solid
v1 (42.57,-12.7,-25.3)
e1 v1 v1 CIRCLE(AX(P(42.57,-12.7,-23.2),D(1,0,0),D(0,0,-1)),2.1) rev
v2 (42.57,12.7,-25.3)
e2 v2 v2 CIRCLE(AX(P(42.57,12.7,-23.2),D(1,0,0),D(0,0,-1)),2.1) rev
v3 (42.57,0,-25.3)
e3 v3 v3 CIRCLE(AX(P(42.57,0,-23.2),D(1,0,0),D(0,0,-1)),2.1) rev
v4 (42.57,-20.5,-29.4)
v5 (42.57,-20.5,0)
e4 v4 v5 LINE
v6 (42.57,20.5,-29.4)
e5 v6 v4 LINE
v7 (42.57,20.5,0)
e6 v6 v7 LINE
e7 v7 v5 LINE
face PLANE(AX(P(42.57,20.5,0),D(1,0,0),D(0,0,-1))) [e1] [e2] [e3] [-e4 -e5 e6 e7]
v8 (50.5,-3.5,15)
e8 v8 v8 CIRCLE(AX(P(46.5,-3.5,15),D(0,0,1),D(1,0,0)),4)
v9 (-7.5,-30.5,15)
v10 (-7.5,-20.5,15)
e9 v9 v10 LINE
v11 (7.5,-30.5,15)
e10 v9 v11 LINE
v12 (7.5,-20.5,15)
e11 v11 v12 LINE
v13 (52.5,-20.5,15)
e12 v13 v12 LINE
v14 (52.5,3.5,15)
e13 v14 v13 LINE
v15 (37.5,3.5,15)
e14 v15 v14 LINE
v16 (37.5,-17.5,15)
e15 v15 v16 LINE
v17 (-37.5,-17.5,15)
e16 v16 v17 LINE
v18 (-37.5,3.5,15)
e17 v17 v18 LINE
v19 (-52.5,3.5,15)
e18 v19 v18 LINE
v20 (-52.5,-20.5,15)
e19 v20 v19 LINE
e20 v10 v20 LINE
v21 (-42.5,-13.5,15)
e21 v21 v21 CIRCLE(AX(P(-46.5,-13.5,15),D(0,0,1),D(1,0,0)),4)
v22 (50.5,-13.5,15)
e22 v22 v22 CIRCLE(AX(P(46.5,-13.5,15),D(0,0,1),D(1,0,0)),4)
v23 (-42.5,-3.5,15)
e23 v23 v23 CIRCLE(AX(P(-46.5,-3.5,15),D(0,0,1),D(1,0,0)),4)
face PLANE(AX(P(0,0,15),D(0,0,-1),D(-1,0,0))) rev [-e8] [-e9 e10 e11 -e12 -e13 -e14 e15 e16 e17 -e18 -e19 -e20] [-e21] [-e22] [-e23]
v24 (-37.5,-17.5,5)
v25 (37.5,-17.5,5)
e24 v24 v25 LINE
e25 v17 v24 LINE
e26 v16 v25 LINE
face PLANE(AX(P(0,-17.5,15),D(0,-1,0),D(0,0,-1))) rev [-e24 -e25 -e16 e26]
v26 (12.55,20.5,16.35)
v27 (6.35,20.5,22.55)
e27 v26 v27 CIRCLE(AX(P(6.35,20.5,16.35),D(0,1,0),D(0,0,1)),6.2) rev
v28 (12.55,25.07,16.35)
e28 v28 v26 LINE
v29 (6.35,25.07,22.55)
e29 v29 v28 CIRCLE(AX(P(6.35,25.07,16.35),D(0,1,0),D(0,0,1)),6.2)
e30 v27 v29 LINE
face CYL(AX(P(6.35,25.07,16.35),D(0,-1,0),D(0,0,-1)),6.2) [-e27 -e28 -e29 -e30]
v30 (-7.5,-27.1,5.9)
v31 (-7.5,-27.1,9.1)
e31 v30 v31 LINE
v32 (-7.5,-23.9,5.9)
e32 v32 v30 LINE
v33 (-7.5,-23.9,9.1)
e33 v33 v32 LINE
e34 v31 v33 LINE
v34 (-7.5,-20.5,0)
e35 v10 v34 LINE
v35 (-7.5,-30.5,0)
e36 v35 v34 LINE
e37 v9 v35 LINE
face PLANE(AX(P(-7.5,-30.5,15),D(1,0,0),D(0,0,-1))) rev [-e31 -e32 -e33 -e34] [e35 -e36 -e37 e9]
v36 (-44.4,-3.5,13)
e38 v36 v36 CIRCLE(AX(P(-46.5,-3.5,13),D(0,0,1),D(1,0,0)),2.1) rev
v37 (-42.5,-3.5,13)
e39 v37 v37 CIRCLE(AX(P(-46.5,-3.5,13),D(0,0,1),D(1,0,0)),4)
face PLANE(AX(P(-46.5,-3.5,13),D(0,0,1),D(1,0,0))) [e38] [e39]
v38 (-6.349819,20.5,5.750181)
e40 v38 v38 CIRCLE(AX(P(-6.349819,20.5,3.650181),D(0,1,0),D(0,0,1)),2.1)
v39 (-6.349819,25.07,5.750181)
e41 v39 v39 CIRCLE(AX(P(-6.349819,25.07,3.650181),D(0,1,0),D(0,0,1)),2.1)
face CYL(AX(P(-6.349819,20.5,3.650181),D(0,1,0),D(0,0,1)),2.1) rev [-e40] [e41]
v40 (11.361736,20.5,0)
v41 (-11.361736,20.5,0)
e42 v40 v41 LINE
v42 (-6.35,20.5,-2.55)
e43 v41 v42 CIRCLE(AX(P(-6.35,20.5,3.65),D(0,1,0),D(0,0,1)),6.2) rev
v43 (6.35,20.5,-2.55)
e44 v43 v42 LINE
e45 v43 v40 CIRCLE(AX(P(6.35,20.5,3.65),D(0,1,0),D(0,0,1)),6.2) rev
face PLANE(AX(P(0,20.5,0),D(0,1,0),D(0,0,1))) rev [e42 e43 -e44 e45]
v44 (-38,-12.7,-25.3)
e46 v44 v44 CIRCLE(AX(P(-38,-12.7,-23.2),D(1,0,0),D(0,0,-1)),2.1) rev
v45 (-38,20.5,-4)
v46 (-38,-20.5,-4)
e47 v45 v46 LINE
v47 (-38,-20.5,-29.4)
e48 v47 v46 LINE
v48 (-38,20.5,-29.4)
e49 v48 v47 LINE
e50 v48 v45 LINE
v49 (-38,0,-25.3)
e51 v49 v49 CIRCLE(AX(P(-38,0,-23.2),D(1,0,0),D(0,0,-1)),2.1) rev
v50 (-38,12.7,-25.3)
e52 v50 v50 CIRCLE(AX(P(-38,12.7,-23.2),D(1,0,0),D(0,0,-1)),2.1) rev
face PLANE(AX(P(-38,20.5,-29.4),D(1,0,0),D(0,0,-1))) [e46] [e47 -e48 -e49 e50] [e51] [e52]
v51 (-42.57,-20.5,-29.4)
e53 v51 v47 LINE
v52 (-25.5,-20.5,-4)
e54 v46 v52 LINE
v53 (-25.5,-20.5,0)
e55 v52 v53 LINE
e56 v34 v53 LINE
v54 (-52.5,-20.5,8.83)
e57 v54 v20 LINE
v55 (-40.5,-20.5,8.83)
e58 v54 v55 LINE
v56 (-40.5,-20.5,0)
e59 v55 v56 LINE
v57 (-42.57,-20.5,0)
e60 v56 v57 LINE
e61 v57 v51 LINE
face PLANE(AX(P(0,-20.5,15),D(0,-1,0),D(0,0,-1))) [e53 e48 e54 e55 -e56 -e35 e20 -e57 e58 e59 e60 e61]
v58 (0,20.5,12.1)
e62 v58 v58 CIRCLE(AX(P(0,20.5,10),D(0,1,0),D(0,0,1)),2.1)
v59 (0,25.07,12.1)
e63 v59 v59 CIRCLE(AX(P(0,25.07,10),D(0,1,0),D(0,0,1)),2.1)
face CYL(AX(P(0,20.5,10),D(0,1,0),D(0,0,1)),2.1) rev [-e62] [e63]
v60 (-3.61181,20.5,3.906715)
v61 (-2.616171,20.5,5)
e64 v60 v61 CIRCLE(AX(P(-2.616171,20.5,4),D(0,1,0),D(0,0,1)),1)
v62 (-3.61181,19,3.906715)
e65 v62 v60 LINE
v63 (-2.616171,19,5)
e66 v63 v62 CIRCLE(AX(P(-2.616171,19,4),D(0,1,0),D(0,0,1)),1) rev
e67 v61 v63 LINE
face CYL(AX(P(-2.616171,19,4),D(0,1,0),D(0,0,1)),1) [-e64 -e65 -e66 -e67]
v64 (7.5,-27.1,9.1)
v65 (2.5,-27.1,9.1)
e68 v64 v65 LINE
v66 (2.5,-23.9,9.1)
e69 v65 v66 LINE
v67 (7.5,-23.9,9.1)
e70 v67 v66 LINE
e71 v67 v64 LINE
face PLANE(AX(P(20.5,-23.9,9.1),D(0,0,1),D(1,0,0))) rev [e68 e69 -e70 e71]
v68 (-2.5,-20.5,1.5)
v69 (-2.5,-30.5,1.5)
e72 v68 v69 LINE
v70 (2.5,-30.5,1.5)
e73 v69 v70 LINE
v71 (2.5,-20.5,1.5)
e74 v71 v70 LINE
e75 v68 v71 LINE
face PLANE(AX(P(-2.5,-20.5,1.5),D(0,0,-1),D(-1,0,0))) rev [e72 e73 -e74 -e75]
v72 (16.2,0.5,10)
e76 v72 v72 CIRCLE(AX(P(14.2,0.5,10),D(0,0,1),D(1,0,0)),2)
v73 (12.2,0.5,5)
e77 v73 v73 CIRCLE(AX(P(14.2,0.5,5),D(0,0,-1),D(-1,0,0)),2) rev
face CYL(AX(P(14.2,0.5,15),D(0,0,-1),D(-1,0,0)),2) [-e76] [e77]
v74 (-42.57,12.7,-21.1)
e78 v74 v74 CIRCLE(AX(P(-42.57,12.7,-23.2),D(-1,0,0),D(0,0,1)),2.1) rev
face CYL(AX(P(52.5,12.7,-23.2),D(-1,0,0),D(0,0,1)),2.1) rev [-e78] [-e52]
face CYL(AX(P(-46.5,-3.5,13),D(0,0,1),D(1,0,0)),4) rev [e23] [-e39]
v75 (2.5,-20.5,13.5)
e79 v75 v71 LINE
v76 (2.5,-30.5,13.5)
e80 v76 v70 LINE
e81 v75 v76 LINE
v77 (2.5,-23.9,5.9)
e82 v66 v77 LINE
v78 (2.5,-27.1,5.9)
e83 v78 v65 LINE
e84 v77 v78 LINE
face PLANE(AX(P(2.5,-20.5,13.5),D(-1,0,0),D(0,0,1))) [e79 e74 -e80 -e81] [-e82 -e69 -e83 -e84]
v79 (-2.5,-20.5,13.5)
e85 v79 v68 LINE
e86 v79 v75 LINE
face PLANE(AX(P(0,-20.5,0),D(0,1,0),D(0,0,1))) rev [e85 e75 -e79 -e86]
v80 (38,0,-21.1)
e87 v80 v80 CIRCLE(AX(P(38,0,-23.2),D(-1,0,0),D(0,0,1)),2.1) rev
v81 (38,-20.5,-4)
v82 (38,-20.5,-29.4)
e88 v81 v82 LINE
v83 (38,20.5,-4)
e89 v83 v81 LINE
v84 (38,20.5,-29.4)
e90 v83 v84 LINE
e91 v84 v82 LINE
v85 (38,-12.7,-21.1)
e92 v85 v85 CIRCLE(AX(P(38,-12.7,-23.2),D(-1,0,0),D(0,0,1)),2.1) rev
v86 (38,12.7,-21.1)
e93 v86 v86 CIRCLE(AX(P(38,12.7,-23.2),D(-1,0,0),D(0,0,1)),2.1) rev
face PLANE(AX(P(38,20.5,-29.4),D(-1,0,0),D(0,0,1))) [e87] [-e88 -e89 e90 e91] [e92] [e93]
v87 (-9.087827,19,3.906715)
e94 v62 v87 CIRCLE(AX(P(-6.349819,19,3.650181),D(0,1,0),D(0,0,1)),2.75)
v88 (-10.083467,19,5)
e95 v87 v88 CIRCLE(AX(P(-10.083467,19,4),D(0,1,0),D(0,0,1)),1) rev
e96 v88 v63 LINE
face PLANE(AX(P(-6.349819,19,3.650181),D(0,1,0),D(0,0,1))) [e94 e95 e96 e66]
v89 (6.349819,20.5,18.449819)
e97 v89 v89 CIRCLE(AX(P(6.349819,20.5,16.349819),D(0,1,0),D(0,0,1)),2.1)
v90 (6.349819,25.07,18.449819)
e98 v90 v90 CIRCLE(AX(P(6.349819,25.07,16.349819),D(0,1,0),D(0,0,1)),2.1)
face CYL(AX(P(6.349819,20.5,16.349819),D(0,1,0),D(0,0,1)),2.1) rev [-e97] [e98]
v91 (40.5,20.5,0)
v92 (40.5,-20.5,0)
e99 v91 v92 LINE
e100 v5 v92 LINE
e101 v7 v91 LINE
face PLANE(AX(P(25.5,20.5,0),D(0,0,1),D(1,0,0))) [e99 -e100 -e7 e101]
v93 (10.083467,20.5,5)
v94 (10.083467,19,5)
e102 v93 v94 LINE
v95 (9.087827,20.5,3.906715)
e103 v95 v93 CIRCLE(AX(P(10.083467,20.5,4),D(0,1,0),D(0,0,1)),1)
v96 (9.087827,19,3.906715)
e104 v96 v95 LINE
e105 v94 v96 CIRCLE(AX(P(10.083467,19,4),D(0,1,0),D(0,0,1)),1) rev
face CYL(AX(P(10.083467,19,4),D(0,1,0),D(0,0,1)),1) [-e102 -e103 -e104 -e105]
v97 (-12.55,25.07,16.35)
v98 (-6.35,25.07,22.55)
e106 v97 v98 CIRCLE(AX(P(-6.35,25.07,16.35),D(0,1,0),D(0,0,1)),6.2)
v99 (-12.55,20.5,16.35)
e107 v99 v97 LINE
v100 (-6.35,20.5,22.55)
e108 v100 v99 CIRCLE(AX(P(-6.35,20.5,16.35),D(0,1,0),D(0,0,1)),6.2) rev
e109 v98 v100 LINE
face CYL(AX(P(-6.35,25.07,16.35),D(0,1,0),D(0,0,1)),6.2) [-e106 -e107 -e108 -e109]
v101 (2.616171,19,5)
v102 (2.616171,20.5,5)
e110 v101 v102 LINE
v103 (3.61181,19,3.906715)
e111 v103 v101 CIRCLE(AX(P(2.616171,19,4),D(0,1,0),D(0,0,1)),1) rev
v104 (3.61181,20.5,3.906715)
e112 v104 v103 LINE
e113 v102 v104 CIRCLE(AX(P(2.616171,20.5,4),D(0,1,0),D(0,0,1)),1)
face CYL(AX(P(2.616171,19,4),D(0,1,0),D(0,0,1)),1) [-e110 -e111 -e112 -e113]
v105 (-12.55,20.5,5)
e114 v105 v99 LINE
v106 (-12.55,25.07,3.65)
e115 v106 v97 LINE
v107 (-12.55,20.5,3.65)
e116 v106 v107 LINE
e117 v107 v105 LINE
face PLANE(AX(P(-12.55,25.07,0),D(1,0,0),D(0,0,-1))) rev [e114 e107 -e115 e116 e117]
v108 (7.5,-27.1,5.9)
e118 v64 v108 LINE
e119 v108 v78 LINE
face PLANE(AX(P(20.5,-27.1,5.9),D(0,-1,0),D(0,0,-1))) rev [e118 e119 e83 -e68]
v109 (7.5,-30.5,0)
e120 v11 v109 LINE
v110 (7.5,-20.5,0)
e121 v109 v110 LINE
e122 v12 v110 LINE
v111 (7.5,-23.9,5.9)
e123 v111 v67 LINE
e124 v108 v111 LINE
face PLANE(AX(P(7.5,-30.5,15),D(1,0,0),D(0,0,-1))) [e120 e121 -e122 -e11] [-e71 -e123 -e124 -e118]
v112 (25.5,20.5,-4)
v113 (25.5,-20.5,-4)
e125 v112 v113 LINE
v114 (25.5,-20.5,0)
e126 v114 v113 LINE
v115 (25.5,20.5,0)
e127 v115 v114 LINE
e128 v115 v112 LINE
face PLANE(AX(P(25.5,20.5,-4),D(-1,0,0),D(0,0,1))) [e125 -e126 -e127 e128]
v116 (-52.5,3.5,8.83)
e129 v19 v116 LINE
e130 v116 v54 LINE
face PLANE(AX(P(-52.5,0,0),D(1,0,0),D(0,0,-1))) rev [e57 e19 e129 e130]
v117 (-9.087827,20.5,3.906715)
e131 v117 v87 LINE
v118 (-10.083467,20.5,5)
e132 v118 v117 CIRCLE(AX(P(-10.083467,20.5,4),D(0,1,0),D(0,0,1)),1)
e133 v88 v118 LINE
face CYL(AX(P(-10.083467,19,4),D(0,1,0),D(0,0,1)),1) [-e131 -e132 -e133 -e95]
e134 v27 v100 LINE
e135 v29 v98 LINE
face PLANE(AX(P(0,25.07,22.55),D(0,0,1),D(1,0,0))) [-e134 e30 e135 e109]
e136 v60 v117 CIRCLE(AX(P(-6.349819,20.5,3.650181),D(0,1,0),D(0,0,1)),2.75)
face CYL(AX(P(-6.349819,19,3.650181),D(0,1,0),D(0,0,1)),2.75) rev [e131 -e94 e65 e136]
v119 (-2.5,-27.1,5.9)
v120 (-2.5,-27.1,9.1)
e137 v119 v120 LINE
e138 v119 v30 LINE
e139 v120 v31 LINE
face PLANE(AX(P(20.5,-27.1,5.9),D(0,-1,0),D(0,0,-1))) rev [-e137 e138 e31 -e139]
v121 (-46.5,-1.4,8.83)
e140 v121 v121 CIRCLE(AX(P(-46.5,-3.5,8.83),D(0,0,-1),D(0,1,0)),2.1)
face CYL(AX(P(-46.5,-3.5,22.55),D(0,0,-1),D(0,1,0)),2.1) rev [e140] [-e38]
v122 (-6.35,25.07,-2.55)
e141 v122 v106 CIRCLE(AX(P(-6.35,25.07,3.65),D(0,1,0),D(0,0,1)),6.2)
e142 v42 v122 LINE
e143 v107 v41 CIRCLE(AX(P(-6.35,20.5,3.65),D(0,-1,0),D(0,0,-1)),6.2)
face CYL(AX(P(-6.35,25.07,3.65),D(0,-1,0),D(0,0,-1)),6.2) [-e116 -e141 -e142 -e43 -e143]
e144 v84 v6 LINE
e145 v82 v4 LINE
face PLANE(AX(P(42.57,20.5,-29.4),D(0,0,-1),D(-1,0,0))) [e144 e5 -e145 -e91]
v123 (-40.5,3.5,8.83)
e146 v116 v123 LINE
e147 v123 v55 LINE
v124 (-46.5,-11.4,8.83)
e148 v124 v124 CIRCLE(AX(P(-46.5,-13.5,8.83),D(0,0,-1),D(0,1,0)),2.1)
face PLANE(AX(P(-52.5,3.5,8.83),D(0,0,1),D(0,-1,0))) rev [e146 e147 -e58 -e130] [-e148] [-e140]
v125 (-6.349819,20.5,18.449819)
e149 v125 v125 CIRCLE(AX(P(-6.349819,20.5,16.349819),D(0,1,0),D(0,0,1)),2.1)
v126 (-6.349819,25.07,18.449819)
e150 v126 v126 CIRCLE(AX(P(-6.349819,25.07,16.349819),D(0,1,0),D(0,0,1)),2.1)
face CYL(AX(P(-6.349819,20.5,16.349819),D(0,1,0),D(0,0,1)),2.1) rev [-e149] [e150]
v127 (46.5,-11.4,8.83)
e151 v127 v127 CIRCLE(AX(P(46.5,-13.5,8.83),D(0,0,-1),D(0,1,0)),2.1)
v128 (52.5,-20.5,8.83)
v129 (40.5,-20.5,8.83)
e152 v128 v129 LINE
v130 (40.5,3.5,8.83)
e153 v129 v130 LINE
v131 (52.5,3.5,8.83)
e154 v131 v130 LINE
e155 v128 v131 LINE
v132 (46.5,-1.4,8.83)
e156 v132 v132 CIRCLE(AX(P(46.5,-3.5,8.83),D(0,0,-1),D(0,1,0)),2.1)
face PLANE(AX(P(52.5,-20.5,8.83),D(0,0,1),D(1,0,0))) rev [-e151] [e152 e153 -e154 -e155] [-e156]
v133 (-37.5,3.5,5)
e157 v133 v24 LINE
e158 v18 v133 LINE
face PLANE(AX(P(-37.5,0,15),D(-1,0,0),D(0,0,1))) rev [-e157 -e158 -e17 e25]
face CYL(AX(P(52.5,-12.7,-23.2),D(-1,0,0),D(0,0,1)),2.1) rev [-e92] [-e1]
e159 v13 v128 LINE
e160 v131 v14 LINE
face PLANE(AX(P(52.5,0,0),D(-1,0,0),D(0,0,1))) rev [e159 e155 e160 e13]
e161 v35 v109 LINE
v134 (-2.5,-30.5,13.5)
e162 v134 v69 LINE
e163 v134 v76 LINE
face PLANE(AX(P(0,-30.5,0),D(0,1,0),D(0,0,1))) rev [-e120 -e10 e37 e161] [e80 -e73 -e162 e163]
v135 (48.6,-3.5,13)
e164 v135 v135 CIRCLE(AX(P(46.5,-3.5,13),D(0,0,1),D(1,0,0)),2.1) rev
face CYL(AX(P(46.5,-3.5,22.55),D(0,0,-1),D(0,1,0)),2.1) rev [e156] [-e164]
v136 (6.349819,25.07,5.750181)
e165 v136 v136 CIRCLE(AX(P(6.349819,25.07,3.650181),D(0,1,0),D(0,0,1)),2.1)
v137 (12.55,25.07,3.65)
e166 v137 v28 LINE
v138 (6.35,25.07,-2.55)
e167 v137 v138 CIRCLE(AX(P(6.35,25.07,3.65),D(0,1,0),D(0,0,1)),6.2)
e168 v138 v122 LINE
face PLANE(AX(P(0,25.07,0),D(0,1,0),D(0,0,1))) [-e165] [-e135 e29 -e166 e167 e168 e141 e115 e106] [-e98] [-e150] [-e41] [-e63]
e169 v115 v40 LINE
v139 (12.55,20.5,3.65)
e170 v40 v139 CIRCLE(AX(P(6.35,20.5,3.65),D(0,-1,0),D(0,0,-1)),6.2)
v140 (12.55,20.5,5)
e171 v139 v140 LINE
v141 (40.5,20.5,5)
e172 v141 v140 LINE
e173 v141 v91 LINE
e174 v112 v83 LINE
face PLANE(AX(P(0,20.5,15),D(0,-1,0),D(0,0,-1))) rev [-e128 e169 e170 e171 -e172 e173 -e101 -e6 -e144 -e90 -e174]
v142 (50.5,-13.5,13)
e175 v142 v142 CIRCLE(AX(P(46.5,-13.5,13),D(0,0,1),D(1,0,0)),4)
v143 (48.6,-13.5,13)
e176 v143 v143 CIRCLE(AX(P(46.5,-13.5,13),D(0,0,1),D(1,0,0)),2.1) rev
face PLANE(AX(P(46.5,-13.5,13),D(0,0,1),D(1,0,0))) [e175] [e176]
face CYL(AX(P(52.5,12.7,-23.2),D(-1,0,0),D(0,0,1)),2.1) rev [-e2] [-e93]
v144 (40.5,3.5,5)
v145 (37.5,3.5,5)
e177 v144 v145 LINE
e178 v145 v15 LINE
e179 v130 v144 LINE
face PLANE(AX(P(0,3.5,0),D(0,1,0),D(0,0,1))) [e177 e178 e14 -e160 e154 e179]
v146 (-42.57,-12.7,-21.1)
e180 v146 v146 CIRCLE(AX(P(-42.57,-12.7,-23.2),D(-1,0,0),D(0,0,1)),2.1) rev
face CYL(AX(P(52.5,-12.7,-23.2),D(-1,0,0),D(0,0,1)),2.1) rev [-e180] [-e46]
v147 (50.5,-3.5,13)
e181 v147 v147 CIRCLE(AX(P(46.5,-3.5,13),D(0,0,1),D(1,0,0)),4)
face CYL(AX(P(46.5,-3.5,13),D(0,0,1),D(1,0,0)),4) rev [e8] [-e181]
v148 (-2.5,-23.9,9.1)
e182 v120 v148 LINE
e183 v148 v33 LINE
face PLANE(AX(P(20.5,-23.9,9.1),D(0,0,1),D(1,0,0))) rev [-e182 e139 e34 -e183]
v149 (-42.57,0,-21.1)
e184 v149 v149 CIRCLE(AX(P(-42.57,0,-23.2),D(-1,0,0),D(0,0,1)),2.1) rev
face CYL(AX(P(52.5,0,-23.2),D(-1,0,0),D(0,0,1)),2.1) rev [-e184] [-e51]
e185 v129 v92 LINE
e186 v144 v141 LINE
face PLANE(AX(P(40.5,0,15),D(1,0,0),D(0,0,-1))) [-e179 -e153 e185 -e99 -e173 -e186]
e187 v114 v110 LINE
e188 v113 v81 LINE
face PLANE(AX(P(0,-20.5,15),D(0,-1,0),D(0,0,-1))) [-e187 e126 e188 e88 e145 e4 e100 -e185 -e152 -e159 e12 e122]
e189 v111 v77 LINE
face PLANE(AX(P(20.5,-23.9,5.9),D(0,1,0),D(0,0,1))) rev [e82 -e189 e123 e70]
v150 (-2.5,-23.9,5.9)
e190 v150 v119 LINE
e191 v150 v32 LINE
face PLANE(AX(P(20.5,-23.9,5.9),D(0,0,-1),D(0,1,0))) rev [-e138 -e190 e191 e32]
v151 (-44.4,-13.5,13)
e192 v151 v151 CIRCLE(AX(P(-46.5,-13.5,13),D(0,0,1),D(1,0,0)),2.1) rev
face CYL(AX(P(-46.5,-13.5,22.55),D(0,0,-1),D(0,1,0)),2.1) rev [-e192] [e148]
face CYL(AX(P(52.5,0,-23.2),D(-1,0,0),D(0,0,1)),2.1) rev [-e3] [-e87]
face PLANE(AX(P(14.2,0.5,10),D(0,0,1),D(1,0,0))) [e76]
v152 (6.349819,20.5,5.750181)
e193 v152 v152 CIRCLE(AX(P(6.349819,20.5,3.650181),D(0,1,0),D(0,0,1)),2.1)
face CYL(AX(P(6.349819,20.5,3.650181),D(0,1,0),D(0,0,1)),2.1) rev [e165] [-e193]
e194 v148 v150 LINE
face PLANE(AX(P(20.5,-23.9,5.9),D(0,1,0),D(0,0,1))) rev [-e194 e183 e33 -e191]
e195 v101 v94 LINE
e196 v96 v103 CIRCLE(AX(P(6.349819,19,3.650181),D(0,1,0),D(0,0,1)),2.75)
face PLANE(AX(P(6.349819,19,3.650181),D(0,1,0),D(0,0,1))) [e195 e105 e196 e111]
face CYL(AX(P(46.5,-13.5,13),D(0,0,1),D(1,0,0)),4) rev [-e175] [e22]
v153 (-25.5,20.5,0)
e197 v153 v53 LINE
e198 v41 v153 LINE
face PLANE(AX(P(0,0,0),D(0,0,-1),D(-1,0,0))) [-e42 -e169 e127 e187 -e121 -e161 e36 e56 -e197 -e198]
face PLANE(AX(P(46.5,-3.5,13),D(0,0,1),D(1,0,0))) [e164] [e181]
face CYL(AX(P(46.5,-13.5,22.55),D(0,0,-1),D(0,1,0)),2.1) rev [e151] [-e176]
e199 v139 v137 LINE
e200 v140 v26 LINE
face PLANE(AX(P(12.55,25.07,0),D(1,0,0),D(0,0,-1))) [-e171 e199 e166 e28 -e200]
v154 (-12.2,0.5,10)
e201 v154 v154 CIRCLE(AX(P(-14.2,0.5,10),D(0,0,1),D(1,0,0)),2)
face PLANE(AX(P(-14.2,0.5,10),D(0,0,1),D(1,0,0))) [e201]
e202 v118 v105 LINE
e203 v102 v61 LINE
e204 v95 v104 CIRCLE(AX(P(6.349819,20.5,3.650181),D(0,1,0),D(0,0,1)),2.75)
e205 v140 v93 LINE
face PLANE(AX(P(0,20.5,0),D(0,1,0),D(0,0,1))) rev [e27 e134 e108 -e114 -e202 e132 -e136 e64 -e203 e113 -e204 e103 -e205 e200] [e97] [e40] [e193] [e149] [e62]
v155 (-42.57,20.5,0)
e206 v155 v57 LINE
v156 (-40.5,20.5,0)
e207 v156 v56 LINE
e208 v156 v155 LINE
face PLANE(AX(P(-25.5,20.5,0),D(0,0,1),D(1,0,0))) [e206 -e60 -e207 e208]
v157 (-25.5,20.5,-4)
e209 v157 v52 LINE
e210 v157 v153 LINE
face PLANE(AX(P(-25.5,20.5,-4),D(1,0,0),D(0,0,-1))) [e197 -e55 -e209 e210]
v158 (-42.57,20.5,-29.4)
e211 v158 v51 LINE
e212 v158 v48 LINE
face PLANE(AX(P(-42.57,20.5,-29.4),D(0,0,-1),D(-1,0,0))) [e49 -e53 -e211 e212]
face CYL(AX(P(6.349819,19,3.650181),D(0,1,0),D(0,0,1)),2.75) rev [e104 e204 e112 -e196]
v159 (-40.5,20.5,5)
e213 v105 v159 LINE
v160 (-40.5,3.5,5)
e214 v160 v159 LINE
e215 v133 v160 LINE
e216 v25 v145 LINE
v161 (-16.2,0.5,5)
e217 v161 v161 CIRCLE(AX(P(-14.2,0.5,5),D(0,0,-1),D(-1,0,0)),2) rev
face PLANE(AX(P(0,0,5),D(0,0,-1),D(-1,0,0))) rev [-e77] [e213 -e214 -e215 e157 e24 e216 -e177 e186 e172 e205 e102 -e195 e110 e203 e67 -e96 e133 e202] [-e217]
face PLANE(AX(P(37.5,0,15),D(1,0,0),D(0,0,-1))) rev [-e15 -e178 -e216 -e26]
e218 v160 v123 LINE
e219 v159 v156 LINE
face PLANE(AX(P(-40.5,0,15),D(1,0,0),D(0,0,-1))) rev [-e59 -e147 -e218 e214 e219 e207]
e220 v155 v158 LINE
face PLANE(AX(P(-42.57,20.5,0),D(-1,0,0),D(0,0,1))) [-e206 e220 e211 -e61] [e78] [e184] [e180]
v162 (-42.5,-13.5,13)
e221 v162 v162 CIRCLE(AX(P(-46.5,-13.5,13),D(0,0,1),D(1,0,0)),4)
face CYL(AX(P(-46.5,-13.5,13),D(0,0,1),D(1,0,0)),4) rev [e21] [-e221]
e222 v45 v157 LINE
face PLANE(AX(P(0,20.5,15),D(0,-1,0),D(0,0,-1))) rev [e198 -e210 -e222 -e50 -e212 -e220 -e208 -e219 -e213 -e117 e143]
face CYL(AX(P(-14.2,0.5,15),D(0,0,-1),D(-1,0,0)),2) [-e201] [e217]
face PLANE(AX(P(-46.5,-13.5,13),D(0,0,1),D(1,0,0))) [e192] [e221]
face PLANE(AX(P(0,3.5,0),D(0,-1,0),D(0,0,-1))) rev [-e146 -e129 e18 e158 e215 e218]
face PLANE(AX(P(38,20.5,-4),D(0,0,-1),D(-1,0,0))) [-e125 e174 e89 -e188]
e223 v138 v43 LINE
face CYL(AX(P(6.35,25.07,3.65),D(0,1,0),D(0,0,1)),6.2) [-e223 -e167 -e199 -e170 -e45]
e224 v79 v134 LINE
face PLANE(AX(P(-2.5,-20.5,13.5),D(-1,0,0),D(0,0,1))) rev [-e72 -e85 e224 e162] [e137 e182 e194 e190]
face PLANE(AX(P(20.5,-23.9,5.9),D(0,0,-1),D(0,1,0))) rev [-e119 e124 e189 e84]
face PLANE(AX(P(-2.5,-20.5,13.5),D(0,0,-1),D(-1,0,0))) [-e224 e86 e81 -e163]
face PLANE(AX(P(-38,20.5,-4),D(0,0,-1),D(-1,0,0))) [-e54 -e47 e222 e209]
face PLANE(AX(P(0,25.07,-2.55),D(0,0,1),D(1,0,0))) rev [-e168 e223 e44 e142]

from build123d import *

# Parameters (mm, degrees)
SKETCH1_W                = 75
SKETCH1_H                = 35
BOSS_EXTRUDE1_DEPTH      = 5
SKETCH2_R                = 2
BOSS_EXTRUDE2_DEPTH      = 10
SKETCH3_W                = 75
SKETCH3_H                = 35
BOSS_EXTRUDE3_DEPTH      = 15
CUT_EXTRUDE2_DEPTH       = 10
SKETCH8_W                = 12.55
SKETCH8_H                = 5
SKETCH8_H_2              = 2.55
BOSS_EXTRUDE6_DEPTH      = 4.57
SKETCH9_R                = 2.1
CUT_EXTRUDE3_DEPTH       = 4.57
SKETCH14_W               = 3
SKETCH14_H               = 10
CUT_EXTRUDE5_DEPTH       = 17
SKETCH15_R               = 2.75
CUT_EXTRUDE6_DEPTH       = 1.5
FILLET1_R                = 1
CUT_EXTRUDE7_START       = -5
SKETCH19_R               = 2
CUT_EXTRUDE7_DEPTH       = 5
SKETCH20_W               = 6.17
SKETCH20_H               = 24
BOSS_EXTRUDE7_DEPTH      = 12
SKETCH21_W               = 6.17
SKETCH21_H               = 24
BOSS_EXTRUDE8_DEPTH      = 12
SKETCH24_R               = 2.1
CUT_EXTRUDE8_DEPTH       = 60.774520492
SKETCH25_R               = 4
CUT_EXTRUDE9_DEPTH       = 2
BOSS_EXTRUDE10_DEPTH     = 41
CUT_EXTRUDE11_DEPTH      = 99.402819573
CUT_EXTRUDE11_DEPTH_BACK = 99.402819573
SKETCH30_R               = 2.1
FILLET2_R                = 6.2
SKETCH31_W               = 15
SKETCH31_H               = 15
BOSS_EXTRUDE11_DEPTH     = 10
SKETCH32_W               = 5
SKETCH32_H               = 12
CUT_EXTRUDE12_DEPTH      = 10
SKETCH34_W               = 3.2
SKETCH34_H               = 3.2
CUT_EXTRUDE13_DEPTH      = 28
CUT_EXTRUDE14_START      = -5
SKETCH35_R               = 2
CUT_EXTRUDE14_DEPTH      = 5


with BuildPart() as part:
    # Sketch1 → Boss-Extrude1 (new body)
    with BuildSketch(Plane.XY):
        Rectangle(SKETCH1_W, SKETCH1_H)
    extrude(amount=BOSS_EXTRUDE1_DEPTH)

    # Sketch2 → Boss-Extrude2 (add)
    with BuildSketch(Plane.XY.offset(5)):
        with Locations(Location((-14.2, 0.5, 0), (0, 0, 180))):
            Circle(SKETCH2_R)
        with Locations(Location((14.2, 0.5, 0), (0, 0, 180))):
            Circle(SKETCH2_R)
    extrude(amount=BOSS_EXTRUDE2_DEPTH)

    # Sketch3 → Boss-Extrude3 (add)
    with BuildSketch(Plane(origin=(0, 0, 0), x_dir=(-1, 0, 0), z_dir=(0, 0, -1))):
        Polygon((40.5, 20.5), (-37.5, 20.5), (-40.5, 20.5), (-40.5, -20.5), (40.5, -20.5), (40.5, -17.5), align=None)
        Rectangle(SKETCH3_W, SKETCH3_H, mode=Mode.SUBTRACT)
    extrude(amount=-BOSS_EXTRUDE3_DEPTH)

    # Sketch4 → Cut-Extrude2 (cut)
    with BuildSketch(Plane(origin=(0, 20.5, 0), x_dir=(1, 0, 0), z_dir=(0, 1, 0))):
        Polygon((-37.5, -5), (-37.5, -12.5), (-37.5, -14), (-37.5, -15), (37.5, -15), (37.5, -14), (37.5, -12.5), (37.5, -5), align=None)
    extrude(amount=-CUT_EXTRUDE2_DEPTH, mode=Mode.SUBTRACT)

    # Sketch8 → Boss-Extrude6 (add)
    with BuildSketch(Plane(origin=(0, 20.5, 0), x_dir=(1, 0, 0), z_dir=(0, 1, 0))):
        Polygon((0, -15), (0, -5), (-12.55, -5), (-12.55, -22.55), (0, -22.55), align=None)
        Polygon((12.55, -5), (0, -5), (0, -15), (0, -22.55), (12.55, -22.55), align=None)
        with Locations((-6.275, -2.5)):
            Rectangle(SKETCH8_W, SKETCH8_H)
        with Locations((-6.275, 1.275)):
            Rectangle(SKETCH8_W, SKETCH8_H_2)
        with Locations((6.275, 1.275)):
            Rectangle(SKETCH8_W, SKETCH8_H_2)
        with Locations((6.275, -2.5)):
            Rectangle(SKETCH8_W, SKETCH8_H)
    extrude(amount=BOSS_EXTRUDE6_DEPTH)

    # Sketch9 → Cut-Extrude3 (cut)
    with BuildSketch(Plane(origin=(0, 25.07, 0), x_dir=(1, 0, 0), z_dir=(0, 1, 0))):
        with Locations(Location((0, -10, 0), (0, 0, 270))):
            Circle(SKETCH9_R)
        with Locations(Location((-6.349818895, -3.650181105, 0), (0, 0, 270))):
            Circle(SKETCH9_R)
        with Locations(Location((6.349818895, -3.650181105, 0), (0, 0, 270))):
            Circle(SKETCH9_R)
        with Locations(Location((6.349818895, -16.349818895, 0), (0, 0, 270))):
            Circle(SKETCH9_R)
        with Locations(Location((-6.349818895, -16.349818895, 0), (0, 0, 270))):
            Circle(SKETCH9_R)
    extrude(amount=-CUT_EXTRUDE3_DEPTH, mode=Mode.SUBTRACT)

    # Sketch14 → Cut-Extrude5 (cut)
    with BuildSketch(Plane(origin=(0, 20.5, 0), x_dir=(1, 0, 0), z_dir=(0, 1, 0))):
        with Locations((-39, -10)):
            Rectangle(SKETCH14_W, SKETCH14_H)
        with Locations((39, -10)):
            Rectangle(SKETCH14_W, SKETCH14_H)
    extrude(amount=-CUT_EXTRUDE5_DEPTH, mode=Mode.SUBTRACT)

    # Sketch15 → Cut-Extrude6 (cut)
    with BuildSketch(Plane(origin=(0, 20.5, 0), x_dir=(1, 0, 0), z_dir=(0, 1, 0))):
        with Locations((-6.349818895, -3.650181105)):
            Circle(SKETCH15_R)
        with Locations((6.349818895, -3.650181105)):
            Circle(SKETCH15_R)
    extrude(amount=-CUT_EXTRUDE6_DEPTH, mode=Mode.SUBTRACT)

    # Fillet1
    fillet1_edges = [part.edges().sort_by_distance(p)[0] for p in [
        (-8.745750645, 19.75, 5),
        (-3.953887145, 19.75, 5),
        (3.953887145, 19.75, 5),
        (8.745750645, 19.75, 5),
    ]]
    fillet(fillet1_edges, radius=FILLET1_R)

    # Sketch19 → Cut-Extrude7 (cut)
    with BuildSketch(Plane.XY.offset(15).offset(CUT_EXTRUDE7_START)):
        with Locations(Location((-14.2, 0.5, 0), (0, 0, 180))):
            Circle(SKETCH19_R)
    extrude(amount=CUT_EXTRUDE7_DEPTH, mode=Mode.SUBTRACT)

    # Sketch20 → Boss-Extrude7 (add)
    with BuildSketch(Plane(origin=(40.5, 0, 0), x_dir=(0, 0, -1), z_dir=(1, 0, 0))):
        with Locations((-11.915, -8.5)):
            Rectangle(SKETCH20_W, SKETCH20_H)
    extrude(amount=BOSS_EXTRUDE7_DEPTH)

    # Sketch21 → Boss-Extrude8 (add)
    with BuildSketch(Plane.ZY.offset(40.5)):
        with Locations((11.915, -8.5)):
            Rectangle(SKETCH21_W, SKETCH21_H)
    extrude(amount=BOSS_EXTRUDE8_DEPTH)

    # Sketch24 → Cut-Extrude8 (cut, through all)
    with BuildSketch(Plane(origin=(0, 0, 8.83), x_dir=(-1, 0, 0), z_dir=(0, 0, -1))):
        with Locations(Location((-46.5, -3.5, 0), (0, 0, 90))):
            Circle(SKETCH24_R)
        with Locations(Location((-46.5, -13.5, 0), (0, 0, 90))):
            Circle(SKETCH24_R)
        with Locations(Location((46.5, -3.5, 0), (0, 0, 90))):
            Circle(SKETCH24_R)
        with Locations(Location((46.5, -13.5, 0), (0, 0, 90))):
            Circle(SKETCH24_R)
    extrude(amount=-CUT_EXTRUDE8_DEPTH, mode=Mode.SUBTRACT)

    # Sketch25 → Cut-Extrude9 (cut)
    with BuildSketch(Plane.XY.offset(15)):
        with Locations((-46.5, -3.5)):
            Circle(SKETCH25_R)
        with Locations((-46.5, -13.5)):
            Circle(SKETCH25_R)
        with Locations((46.5, -13.5)):
            Circle(SKETCH25_R)
        with Locations((46.5, -3.5)):
            Circle(SKETCH25_R)
    extrude(amount=-CUT_EXTRUDE9_DEPTH, mode=Mode.SUBTRACT)

    # Sketch28 → Boss-Extrude10 (add)
    with BuildSketch(Plane.XZ.offset(20.5)):
        Polygon((-25.5, 0), (-42.57, 0), (-42.57, -29.4), (-38, -29.4), (-38, -4), (-25.5, -4), align=None)
        Polygon((25.5, 0), (42.57, 0), (42.57, -29.4), (38, -29.4), (38, -4), (25.5, -4), align=None)
    extrude(amount=-BOSS_EXTRUDE10_DEPTH)

    # Sketch30 → Cut-Extrude11 (cut, two sides: drawn at the far end of the back side and taken through both)
    with BuildSketch(Plane(origin=(-38, 0, 0), x_dir=(0, 0, -1), z_dir=(1, 0, 0)).offset(-CUT_EXTRUDE11_DEPTH_BACK)):
        with Locations(Location((23.2, 0, 0), (0, 0, 180))):
            Circle(SKETCH30_R)
        with Locations(Location((23.2, 12.7, 0), (0, 0, 180))):
            Circle(SKETCH30_R)
        with Locations(Location((23.2, -12.7, 0), (0, 0, 180))):
            Circle(SKETCH30_R)
    extrude(amount=CUT_EXTRUDE11_DEPTH + CUT_EXTRUDE11_DEPTH_BACK, mode=Mode.SUBTRACT)

    # Fillet2
    # the kernel refuses this fillet: 6.2 mm, written as the material it takes off along each edge
    with BuildSketch(Plane(origin=(12.55, 5, 22.55), x_dir=(0, 0, -1), z_dir=(0, 1, 0))) as fillet2_piece_1:
        with BuildLine():
            CenterArc((FILLET2_R, FILLET2_R), FILLET2_R, 180, 90)
            Line((0, FILLET2_R), (0, 0))
            Line((0, 0), (FILLET2_R, 0))
        make_face()
    extrude(amount=35.57, mode=Mode.SUBTRACT)
    with BuildSketch(Plane(origin=(12.55, 20.5, -2.55), x_dir=(0, 0, 1), z_dir=(0, 1, 0))) as fillet2_piece_2:
        with BuildLine():
            CenterArc((FILLET2_R, -FILLET2_R), FILLET2_R, 90, 90)
            Line((0, -FILLET2_R), (0, 0))
            Line((0, 0), (FILLET2_R, 0))
        make_face()
    extrude(amount=20.07, mode=Mode.SUBTRACT)
    with BuildSketch(Plane(origin=(-12.55, 20.5, -2.55), x_dir=(0, 0, 1), z_dir=(0, 1, 0))) as fillet2_piece_3:
        with BuildLine():
            CenterArc((FILLET2_R, FILLET2_R), FILLET2_R, 180, 90)
            Line((0, FILLET2_R), (0, 0))
            Line((0, 0), (FILLET2_R, 0))
        make_face()
    extrude(amount=20.07, mode=Mode.SUBTRACT)
    with BuildSketch(Plane(origin=(-12.55, 5, 22.55), x_dir=(0, 0, -1), z_dir=(0, 1, 0))) as fillet2_piece_4:
        with BuildLine():
            CenterArc((FILLET2_R, -FILLET2_R), FILLET2_R, 90, 90)
            Line((0, -FILLET2_R), (0, 0))
            Line((0, 0), (FILLET2_R, 0))
        make_face()
    extrude(amount=35.57, mode=Mode.SUBTRACT)

    # Sketch31 → Boss-Extrude11 (add)
    with BuildSketch(Plane.XZ.offset(20.5)):
        with Locations((0, 7.5)):
            Rectangle(SKETCH31_W, SKETCH31_H)
    extrude(amount=BOSS_EXTRUDE11_DEPTH)

    # Sketch32 → Cut-Extrude12 (cut)
    with BuildSketch(Plane.XZ.offset(30.5)):
        with Locations((0, 7.5)):
            Rectangle(SKETCH32_W, SKETCH32_H)
    extrude(amount=-CUT_EXTRUDE12_DEPTH, mode=Mode.SUBTRACT)

    # Sketch34 → Cut-Extrude13 (cut)
    with BuildSketch(Plane.ZY.offset(7.5)):
        with Locations((7.5, -25.5)):
            Rectangle(SKETCH34_W, SKETCH34_H)
    extrude(amount=-CUT_EXTRUDE13_DEPTH, mode=Mode.SUBTRACT)

    # Sketch35 → Cut-Extrude14 (cut)
    with BuildSketch(Plane.XY.offset(15).offset(CUT_EXTRUDE14_START)):
        with Locations(Location((14.2, 0.5, 0), (0, 0, 180))):
            Circle(SKETCH35_R)
    extrude(amount=CUT_EXTRUDE14_DEPTH, mode=Mode.SUBTRACT)


solid = part.part
